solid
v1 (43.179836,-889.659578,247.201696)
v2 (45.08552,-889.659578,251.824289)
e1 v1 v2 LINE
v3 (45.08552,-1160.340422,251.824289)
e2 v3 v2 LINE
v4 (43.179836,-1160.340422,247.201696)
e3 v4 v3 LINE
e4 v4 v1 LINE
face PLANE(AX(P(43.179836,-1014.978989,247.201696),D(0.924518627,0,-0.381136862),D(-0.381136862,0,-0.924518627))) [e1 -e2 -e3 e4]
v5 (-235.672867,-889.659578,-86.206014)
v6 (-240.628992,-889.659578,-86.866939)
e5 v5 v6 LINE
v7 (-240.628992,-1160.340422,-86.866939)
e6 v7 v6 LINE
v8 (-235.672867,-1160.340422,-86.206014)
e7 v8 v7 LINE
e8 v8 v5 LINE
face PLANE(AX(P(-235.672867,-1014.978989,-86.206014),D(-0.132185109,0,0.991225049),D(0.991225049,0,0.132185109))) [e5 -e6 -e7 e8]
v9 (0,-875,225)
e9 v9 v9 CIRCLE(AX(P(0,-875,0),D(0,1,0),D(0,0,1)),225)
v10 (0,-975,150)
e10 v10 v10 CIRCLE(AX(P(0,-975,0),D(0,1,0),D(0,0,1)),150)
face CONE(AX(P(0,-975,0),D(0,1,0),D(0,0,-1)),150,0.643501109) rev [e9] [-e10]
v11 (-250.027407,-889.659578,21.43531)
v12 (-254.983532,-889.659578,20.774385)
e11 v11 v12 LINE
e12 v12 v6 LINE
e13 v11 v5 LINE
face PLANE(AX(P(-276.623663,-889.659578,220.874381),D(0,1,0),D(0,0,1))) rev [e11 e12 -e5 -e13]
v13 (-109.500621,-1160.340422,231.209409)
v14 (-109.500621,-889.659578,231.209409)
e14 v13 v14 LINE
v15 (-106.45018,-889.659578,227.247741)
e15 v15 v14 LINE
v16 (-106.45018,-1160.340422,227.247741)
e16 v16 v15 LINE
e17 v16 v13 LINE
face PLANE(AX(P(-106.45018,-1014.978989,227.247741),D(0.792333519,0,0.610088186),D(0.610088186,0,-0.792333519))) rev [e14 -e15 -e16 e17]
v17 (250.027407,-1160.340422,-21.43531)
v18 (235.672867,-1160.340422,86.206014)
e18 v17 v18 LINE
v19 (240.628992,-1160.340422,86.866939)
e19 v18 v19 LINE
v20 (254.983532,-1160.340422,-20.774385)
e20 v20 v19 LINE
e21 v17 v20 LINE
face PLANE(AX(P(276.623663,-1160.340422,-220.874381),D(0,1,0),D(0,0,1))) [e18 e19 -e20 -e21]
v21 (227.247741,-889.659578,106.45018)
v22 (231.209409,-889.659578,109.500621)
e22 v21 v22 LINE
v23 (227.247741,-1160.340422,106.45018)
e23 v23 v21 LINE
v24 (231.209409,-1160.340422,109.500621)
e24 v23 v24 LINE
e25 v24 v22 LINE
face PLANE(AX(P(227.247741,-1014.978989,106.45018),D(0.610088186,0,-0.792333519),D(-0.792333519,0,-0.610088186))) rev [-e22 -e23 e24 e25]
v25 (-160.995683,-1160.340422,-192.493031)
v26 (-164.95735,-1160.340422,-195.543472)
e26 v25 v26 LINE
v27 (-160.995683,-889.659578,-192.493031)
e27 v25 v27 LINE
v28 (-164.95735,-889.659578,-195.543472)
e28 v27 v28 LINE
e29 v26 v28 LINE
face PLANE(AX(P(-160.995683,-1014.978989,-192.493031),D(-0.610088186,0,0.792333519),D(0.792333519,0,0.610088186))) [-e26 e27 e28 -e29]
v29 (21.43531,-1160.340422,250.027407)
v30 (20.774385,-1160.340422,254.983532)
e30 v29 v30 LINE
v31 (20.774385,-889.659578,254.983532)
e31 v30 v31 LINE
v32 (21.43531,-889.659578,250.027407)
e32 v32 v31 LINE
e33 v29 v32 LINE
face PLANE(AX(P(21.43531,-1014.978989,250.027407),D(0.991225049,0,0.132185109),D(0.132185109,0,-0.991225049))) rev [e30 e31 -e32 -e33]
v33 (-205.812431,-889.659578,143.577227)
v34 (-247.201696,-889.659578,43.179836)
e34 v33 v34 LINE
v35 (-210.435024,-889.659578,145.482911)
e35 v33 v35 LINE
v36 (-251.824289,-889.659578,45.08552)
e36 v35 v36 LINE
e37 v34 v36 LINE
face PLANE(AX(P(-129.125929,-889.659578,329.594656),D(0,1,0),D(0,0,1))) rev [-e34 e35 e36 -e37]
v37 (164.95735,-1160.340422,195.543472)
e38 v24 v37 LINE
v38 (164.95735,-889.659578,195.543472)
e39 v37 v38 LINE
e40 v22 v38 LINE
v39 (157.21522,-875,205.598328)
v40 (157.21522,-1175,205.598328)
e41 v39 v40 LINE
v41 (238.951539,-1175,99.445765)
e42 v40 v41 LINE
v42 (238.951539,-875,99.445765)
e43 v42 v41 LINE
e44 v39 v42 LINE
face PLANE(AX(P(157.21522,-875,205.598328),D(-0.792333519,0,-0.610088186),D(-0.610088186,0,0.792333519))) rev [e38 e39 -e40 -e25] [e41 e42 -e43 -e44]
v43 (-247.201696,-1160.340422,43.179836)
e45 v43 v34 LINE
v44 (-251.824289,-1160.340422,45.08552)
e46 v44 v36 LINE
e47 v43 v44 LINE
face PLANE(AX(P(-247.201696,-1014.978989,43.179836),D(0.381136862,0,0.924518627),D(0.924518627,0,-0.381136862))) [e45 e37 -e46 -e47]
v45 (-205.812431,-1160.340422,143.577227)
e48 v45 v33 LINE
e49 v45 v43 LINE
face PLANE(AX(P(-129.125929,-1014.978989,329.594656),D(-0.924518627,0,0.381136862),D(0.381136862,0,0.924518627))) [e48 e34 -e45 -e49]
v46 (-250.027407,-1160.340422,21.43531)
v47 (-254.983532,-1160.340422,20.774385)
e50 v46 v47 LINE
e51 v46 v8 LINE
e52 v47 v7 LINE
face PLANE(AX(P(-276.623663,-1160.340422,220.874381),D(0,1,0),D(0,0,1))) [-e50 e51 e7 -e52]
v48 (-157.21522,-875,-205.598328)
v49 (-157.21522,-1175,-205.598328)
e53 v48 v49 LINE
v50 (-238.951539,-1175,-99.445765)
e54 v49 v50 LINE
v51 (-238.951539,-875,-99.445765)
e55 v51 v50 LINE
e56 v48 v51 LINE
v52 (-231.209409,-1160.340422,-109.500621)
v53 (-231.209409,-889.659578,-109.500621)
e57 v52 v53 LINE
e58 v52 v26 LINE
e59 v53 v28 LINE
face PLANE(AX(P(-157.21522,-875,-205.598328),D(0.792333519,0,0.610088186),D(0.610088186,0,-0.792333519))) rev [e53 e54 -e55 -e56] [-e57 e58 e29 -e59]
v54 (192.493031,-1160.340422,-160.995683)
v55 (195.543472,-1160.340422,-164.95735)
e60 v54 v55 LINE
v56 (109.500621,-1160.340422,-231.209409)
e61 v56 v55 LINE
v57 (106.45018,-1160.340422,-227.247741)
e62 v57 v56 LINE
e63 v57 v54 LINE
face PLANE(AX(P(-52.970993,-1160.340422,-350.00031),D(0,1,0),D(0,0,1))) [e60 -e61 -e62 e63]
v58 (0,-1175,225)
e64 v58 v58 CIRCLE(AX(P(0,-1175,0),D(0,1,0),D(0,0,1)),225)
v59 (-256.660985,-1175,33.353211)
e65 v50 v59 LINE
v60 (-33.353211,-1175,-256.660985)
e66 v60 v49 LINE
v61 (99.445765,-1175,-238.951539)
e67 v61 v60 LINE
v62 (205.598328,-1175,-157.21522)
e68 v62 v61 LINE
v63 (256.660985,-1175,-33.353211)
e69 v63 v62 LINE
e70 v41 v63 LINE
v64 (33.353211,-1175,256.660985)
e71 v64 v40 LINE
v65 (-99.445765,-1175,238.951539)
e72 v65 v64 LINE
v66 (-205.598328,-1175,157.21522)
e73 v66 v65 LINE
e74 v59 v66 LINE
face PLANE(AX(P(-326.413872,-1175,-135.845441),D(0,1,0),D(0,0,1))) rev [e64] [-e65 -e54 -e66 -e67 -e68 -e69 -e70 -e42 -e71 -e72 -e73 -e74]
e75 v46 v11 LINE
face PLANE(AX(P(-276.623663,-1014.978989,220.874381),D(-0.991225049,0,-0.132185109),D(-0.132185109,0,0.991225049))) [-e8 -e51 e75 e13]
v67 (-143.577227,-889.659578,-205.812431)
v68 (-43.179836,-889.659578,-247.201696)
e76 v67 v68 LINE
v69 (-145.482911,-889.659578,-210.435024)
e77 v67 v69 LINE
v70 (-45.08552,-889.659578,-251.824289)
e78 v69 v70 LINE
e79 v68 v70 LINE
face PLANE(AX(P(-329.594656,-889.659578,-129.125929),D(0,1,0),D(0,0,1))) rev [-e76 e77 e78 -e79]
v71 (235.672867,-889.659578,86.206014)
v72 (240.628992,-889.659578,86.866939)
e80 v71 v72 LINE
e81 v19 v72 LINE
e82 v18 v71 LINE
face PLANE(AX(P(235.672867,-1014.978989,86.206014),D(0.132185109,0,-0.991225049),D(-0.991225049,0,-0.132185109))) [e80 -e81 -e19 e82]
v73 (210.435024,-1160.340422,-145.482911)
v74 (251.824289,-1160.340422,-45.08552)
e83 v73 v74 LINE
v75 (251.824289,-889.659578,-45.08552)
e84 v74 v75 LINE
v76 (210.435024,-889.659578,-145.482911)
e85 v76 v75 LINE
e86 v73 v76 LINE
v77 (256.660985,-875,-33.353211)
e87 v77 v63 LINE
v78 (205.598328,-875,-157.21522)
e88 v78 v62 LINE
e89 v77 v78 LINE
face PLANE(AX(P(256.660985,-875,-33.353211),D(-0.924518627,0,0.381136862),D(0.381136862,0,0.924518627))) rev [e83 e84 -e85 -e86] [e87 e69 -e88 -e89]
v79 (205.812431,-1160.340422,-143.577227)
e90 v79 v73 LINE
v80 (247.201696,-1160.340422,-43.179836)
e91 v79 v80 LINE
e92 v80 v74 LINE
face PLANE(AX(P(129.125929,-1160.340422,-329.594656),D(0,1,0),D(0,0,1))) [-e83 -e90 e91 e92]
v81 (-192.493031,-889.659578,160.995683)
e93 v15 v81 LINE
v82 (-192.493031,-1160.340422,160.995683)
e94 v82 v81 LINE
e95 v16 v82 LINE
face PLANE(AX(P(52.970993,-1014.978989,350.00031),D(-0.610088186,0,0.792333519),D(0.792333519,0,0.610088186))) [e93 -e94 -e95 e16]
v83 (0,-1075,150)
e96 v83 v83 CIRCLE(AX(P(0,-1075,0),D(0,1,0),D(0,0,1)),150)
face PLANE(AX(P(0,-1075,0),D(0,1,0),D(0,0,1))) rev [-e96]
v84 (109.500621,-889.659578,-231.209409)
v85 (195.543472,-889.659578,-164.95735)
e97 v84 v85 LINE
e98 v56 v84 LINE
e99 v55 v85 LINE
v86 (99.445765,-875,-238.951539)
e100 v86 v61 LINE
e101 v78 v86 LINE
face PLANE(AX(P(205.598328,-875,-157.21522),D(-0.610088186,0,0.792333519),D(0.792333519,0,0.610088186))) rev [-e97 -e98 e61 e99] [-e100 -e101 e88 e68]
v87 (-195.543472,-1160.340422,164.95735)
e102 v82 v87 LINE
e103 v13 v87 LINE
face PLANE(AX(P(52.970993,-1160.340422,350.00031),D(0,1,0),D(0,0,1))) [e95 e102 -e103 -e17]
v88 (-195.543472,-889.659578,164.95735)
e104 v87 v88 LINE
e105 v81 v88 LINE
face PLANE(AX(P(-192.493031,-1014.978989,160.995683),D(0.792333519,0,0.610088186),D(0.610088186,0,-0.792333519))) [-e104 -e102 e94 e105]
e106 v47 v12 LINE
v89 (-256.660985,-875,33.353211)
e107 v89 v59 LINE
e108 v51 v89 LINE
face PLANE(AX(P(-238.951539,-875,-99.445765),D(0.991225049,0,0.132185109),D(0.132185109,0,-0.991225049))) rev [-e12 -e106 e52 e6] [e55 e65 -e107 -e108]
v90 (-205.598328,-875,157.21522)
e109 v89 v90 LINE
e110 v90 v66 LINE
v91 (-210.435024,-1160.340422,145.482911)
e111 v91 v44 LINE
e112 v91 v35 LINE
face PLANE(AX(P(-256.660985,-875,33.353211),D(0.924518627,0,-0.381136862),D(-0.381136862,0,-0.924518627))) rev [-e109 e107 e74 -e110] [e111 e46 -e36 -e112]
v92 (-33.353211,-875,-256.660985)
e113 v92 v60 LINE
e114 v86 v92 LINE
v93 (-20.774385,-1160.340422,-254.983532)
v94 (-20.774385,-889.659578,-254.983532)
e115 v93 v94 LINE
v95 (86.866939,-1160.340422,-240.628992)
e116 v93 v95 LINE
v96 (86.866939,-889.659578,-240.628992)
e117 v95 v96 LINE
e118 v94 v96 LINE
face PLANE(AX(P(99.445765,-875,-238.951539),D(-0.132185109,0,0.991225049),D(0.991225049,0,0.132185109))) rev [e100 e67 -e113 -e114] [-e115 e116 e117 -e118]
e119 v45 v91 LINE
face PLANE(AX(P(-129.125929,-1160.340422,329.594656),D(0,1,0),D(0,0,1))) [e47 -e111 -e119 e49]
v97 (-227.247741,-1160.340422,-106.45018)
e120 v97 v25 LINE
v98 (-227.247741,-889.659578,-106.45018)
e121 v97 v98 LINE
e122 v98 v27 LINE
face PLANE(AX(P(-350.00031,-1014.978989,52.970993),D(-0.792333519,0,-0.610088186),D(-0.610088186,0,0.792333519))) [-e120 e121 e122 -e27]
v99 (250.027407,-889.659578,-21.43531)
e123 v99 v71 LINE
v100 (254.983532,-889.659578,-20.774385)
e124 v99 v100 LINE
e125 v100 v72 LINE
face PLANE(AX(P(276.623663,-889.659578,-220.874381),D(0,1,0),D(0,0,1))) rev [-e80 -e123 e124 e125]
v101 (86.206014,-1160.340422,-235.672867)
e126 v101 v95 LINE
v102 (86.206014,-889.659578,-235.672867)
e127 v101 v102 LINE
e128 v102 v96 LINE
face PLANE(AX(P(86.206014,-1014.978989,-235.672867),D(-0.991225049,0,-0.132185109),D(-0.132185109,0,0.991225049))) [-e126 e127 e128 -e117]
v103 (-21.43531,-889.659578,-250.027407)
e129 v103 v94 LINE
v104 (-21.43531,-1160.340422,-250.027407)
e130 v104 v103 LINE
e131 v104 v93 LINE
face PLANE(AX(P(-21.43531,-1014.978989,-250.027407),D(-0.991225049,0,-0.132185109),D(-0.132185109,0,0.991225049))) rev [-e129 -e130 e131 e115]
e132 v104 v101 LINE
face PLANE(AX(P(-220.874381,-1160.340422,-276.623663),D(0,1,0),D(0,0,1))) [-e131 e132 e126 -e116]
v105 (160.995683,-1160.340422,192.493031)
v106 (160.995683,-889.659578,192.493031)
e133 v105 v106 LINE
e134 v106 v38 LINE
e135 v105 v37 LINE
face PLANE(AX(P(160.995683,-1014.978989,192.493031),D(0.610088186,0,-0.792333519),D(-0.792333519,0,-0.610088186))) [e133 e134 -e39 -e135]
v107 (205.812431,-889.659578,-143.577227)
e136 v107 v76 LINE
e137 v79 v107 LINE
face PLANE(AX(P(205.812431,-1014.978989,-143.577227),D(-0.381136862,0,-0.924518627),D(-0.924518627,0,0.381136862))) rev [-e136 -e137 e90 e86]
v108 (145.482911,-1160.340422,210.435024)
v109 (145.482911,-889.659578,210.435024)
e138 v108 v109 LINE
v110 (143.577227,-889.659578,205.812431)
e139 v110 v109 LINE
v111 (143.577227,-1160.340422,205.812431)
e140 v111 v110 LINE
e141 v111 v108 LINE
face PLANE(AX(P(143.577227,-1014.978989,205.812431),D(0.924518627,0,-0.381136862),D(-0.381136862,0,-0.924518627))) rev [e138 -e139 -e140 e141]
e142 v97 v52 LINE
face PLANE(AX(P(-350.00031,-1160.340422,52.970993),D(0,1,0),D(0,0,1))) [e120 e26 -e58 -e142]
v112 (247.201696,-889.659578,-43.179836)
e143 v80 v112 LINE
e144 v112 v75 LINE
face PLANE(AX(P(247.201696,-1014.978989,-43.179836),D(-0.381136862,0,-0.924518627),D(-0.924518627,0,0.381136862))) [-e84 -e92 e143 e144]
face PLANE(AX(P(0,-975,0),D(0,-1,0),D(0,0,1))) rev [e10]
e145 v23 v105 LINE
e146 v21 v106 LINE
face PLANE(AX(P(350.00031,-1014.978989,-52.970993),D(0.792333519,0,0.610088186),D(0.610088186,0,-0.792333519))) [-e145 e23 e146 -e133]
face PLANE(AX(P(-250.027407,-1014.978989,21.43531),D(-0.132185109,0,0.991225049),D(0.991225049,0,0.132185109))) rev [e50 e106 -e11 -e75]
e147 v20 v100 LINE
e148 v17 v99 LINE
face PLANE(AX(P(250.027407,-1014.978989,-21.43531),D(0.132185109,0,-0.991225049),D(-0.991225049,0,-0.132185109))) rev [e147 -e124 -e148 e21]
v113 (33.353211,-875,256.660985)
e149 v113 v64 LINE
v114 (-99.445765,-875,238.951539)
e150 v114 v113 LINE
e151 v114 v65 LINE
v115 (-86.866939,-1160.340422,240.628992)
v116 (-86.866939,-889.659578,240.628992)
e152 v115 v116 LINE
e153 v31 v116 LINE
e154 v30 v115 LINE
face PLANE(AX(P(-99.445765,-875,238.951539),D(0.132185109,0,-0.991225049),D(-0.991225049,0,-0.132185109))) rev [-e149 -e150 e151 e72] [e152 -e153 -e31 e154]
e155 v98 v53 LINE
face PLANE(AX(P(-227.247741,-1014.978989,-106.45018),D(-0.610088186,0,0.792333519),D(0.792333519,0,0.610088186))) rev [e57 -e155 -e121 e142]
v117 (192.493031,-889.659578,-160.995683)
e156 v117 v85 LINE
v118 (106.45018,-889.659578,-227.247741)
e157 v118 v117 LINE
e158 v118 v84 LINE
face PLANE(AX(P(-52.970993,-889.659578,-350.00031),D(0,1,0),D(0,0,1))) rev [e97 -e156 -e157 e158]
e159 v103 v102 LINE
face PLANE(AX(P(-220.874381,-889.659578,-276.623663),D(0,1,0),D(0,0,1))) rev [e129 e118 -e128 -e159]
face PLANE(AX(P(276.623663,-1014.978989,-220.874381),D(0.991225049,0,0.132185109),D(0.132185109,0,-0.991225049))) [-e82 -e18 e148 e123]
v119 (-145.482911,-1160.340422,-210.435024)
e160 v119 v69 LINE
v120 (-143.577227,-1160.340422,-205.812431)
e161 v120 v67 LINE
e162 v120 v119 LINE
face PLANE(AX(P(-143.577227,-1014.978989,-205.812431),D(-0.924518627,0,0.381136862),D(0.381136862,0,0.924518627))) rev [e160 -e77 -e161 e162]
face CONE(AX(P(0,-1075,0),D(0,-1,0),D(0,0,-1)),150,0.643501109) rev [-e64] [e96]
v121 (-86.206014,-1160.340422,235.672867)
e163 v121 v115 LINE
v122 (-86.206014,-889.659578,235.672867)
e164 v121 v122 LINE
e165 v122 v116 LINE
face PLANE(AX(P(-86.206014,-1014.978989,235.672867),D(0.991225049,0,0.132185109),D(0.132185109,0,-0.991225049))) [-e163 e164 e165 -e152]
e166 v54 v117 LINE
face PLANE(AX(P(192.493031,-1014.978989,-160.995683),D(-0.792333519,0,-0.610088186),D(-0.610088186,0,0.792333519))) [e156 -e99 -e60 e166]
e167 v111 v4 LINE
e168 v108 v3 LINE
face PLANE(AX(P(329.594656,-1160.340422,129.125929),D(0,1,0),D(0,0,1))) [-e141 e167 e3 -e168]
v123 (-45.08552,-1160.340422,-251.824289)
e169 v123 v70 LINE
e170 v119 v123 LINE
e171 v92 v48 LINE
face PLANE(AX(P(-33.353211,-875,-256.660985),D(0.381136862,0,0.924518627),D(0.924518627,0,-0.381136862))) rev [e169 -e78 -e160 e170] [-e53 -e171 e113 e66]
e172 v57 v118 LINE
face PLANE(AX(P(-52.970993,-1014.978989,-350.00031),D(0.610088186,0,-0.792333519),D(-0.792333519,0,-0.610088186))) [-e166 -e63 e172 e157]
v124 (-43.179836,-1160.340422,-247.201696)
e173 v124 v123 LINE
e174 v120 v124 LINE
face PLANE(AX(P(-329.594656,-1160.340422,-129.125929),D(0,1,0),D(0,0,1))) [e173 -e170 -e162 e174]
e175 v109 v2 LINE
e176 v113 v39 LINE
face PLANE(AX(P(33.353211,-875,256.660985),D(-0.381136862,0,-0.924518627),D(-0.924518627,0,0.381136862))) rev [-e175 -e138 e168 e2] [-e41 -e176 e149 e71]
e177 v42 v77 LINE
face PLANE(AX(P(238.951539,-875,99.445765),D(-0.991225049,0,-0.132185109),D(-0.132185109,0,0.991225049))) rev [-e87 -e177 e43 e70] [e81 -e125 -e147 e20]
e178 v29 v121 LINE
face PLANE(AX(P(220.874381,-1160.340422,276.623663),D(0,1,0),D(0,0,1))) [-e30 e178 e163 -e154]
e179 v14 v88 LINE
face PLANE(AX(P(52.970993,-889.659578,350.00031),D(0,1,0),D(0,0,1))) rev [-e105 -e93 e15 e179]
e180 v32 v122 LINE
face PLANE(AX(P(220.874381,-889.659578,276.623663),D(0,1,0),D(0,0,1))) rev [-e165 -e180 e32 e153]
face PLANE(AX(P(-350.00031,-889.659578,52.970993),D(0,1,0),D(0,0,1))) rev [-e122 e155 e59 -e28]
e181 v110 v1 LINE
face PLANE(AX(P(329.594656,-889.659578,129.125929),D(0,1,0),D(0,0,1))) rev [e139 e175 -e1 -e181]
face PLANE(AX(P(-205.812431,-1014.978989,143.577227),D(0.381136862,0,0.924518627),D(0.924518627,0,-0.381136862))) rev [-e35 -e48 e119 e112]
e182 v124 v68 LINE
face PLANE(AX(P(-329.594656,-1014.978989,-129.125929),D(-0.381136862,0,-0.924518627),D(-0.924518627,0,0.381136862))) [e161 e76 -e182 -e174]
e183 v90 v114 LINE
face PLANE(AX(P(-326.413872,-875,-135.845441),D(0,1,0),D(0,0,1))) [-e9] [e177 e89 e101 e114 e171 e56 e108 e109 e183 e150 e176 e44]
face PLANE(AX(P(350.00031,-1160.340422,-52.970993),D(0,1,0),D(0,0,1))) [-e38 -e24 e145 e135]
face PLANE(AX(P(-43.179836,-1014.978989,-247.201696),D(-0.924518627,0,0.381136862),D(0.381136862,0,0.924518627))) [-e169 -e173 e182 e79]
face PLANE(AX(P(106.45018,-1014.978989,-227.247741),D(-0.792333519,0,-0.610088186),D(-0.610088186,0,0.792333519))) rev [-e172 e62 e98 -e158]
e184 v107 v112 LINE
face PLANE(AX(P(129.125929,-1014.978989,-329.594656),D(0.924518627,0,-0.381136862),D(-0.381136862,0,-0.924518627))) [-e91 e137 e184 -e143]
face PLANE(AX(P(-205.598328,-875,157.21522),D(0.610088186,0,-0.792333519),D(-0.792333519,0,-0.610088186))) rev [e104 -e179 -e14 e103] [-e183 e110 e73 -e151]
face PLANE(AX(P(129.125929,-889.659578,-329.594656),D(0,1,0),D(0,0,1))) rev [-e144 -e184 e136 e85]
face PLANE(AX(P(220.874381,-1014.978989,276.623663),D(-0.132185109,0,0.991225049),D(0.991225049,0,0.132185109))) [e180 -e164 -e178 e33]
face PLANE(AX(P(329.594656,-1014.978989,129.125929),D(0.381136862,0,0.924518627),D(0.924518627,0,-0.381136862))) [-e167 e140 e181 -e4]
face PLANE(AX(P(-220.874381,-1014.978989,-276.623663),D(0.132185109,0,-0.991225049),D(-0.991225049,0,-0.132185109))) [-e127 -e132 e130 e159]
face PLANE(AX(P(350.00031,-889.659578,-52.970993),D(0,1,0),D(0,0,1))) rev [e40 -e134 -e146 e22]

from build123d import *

# Parameters (mm, degrees)
SKETCH_1_R               = 90
SKETCH_1_R_2             = 50
EXTRUDE_1_DEPTH          = 50
SKETCH_5_R               = 150
EXTRUDE_2_DEPTH          = 100
SKETCH_6_R               = 150
SKETCH_8_R               = 225
CUT_EXTRUDE_1_DEPTH      = 5
PATTERN_CIRCULAR_1_COUNT = 12


with BuildPart() as part:
    # 草图1 → 凸台-拉伸1 (new, symmetric)
    with BuildSketch(Plane(origin=(0, -1025, 0), x_dir=(-1, 0, 0), z_dir=(0, 1, 0))):
        with Locations(Location((0, 0, 0), (0, 0, 90))):
            Circle(SKETCH_1_R)
        with Locations(Location((0, 0, 0), (0, 0, 90))):
            Circle(SKETCH_1_R_2, mode=Mode.SUBTRACT)
    extrude(amount=EXTRUDE_1_DEPTH, both=True)

    # 草图5 → 凸台-拉伸2 (add)
    with BuildSketch(Plane(origin=(0, -975, 0), x_dir=(-1, 0, 0), z_dir=(0, 1, 0))):
        with Locations(Location((0, 0, 0), (0, 0, 90))):
            Circle(SKETCH_5_R)
    extrude(amount=-EXTRUDE_2_DEPTH)

    # 凸台-拉伸4: read off the stored shape, not the designer's step
    # 凸台-拉伸4: loft between two sections, ruled curve by curve
    extrude_4_from = [
        Edge.make_line((-33.353210676, -1175, -256.660985437), (-157.215220461, -1175, -205.598328211)),
        Edge.make_line((-157.215220461, -1175, -205.598328211), (-238.951538886, -1175, -99.445764975)),
        Edge.make_line((-238.951538886, -1175, -99.445764975), (-256.660985437, -1175, 33.353210676)),
        Edge.make_line((-256.660985437, -1175, 33.353210676), (-205.598328211, -1175, 157.215220461)),
        Edge.make_line((-205.598328211, -1175, 157.215220461), (-99.445764975, -1175, 238.951538886)),
        Edge.make_line((-99.445764975, -1175, 238.951538886), (33.353210676, -1175, 256.660985437)),
        Edge.make_line((33.353210676, -1175, 256.660985437), (157.215220461, -1175, 205.598328211)),
        Edge.make_line((157.215220461, -1175, 205.598328211), (238.951538886, -1175, 99.445764975)),
        Edge.make_line((238.951538886, -1175, 99.445764975), (256.660985437, -1175, -33.353210676)),
        Edge.make_line((256.660985437, -1175, -33.353210676), (205.598328211, -1175, -157.215220461)),
        Edge.make_line((205.598328211, -1175, -157.215220461), (99.445764975, -1175, -238.951538886)),
        Edge.make_line((99.445764975, -1175, -238.951538886), (-33.353210676, -1175, -256.660985437)),
    ]
    extrude_4_to = [
        Edge.make_line((-33.353210676, -875, -256.660985437), (-157.215220461, -875, -205.598328211)),
        Edge.make_line((-157.215220461, -875, -205.598328211), (-238.951538886, -875, -99.445764975)),
        Edge.make_line((-238.951538886, -875, -99.445764975), (-256.660985437, -875, 33.353210676)),
        Edge.make_line((-256.660985437, -875, 33.353210676), (-205.598328211, -875, 157.215220461)),
        Edge.make_line((-205.598328211, -875, 157.215220461), (-99.445764975, -875, 238.951538886)),
        Edge.make_line((-99.445764975, -875, 238.951538886), (33.353210676, -875, 256.660985437)),
        Edge.make_line((33.353210676, -875, 256.660985437), (157.215220461, -875, 205.598328211)),
        Edge.make_line((157.215220461, -875, 205.598328211), (238.951538886, -875, 99.445764975)),
        Edge.make_line((238.951538886, -875, 99.445764975), (256.660985437, -875, -33.353210676)),
        Edge.make_line((256.660985437, -875, -33.353210676), (205.598328211, -875, -157.215220461)),
        Edge.make_line((205.598328211, -875, -157.215220461), (99.445764975, -875, -238.951538886)),
        Edge.make_line((99.445764975, -875, -238.951538886), (-33.353210676, -875, -256.660985437)),
    ]
    extrude_4 = Solid(Shell([*[Face.make_surface_from_curves(extrude_4_from[k], extrude_4_to[k]) for k in range(12)], Face(Wire(extrude_4_from)), Face(Wire(extrude_4_to))]))
    add(extrude_4)

    # 草图6 → 切除-放样3 section 0
    with BuildSketch(Plane(origin=(0, -1075, 0), x_dir=(-1, 0, 0), z_dir=(0, 1, 0))):
        Circle(SKETCH_6_R)
    # 草图8 → 切除-放样3 section 1
    with BuildSketch(Plane(origin=(0, -1175, 0), x_dir=(-1, 0, 0), z_dir=(0, 1, 0))):
        Circle(SKETCH_8_R)
    loft_3 = loft(mode=Mode.SUBTRACT)

    # 镜向2: 切除-放样3 across plane
    add(loft_3.mirror(Plane.ZX.offset(-1025)), mode=Mode.SUBTRACT)

    # 草图9 → 切除-拉伸1 (cut)
    with BuildSketch(Plane(origin=(231.129656824, 0, -95.284215569), x_dir=(-0.3811368622740284, 0, -0.9245186272952581), z_dir=(0.9245186272952581, 0, -0.3811368622740284))):
        Polygon((-54.297116462, -889.659578346), (-54.297116462, -1146.583758404), (54.297116462, -903.416241596), (54.297116462, -889.659578346), align=None)
        Polygon((54.297116462, -903.416241596), (-54.297116462, -1146.583758404), (-54.297116462, -1160.340421654), (54.297116462, -1160.340421654), align=None)
    cut_extrude_1 = extrude(amount=-CUT_EXTRUDE_1_DEPTH, mode=Mode.SUBTRACT)

    # 阵列(圆周)1: 切除-拉伸1 ×12 about axis
    pattern_circular_1_axis = Axis((0, 0, 0), (0, 1, 0))
    for i in range(1, PATTERN_CIRCULAR_1_COUNT):
        add(cut_extrude_1.rotate(pattern_circular_1_axis, i * 360 / PATTERN_CIRCULAR_1_COUNT), mode=Mode.SUBTRACT)


solid = part.part
